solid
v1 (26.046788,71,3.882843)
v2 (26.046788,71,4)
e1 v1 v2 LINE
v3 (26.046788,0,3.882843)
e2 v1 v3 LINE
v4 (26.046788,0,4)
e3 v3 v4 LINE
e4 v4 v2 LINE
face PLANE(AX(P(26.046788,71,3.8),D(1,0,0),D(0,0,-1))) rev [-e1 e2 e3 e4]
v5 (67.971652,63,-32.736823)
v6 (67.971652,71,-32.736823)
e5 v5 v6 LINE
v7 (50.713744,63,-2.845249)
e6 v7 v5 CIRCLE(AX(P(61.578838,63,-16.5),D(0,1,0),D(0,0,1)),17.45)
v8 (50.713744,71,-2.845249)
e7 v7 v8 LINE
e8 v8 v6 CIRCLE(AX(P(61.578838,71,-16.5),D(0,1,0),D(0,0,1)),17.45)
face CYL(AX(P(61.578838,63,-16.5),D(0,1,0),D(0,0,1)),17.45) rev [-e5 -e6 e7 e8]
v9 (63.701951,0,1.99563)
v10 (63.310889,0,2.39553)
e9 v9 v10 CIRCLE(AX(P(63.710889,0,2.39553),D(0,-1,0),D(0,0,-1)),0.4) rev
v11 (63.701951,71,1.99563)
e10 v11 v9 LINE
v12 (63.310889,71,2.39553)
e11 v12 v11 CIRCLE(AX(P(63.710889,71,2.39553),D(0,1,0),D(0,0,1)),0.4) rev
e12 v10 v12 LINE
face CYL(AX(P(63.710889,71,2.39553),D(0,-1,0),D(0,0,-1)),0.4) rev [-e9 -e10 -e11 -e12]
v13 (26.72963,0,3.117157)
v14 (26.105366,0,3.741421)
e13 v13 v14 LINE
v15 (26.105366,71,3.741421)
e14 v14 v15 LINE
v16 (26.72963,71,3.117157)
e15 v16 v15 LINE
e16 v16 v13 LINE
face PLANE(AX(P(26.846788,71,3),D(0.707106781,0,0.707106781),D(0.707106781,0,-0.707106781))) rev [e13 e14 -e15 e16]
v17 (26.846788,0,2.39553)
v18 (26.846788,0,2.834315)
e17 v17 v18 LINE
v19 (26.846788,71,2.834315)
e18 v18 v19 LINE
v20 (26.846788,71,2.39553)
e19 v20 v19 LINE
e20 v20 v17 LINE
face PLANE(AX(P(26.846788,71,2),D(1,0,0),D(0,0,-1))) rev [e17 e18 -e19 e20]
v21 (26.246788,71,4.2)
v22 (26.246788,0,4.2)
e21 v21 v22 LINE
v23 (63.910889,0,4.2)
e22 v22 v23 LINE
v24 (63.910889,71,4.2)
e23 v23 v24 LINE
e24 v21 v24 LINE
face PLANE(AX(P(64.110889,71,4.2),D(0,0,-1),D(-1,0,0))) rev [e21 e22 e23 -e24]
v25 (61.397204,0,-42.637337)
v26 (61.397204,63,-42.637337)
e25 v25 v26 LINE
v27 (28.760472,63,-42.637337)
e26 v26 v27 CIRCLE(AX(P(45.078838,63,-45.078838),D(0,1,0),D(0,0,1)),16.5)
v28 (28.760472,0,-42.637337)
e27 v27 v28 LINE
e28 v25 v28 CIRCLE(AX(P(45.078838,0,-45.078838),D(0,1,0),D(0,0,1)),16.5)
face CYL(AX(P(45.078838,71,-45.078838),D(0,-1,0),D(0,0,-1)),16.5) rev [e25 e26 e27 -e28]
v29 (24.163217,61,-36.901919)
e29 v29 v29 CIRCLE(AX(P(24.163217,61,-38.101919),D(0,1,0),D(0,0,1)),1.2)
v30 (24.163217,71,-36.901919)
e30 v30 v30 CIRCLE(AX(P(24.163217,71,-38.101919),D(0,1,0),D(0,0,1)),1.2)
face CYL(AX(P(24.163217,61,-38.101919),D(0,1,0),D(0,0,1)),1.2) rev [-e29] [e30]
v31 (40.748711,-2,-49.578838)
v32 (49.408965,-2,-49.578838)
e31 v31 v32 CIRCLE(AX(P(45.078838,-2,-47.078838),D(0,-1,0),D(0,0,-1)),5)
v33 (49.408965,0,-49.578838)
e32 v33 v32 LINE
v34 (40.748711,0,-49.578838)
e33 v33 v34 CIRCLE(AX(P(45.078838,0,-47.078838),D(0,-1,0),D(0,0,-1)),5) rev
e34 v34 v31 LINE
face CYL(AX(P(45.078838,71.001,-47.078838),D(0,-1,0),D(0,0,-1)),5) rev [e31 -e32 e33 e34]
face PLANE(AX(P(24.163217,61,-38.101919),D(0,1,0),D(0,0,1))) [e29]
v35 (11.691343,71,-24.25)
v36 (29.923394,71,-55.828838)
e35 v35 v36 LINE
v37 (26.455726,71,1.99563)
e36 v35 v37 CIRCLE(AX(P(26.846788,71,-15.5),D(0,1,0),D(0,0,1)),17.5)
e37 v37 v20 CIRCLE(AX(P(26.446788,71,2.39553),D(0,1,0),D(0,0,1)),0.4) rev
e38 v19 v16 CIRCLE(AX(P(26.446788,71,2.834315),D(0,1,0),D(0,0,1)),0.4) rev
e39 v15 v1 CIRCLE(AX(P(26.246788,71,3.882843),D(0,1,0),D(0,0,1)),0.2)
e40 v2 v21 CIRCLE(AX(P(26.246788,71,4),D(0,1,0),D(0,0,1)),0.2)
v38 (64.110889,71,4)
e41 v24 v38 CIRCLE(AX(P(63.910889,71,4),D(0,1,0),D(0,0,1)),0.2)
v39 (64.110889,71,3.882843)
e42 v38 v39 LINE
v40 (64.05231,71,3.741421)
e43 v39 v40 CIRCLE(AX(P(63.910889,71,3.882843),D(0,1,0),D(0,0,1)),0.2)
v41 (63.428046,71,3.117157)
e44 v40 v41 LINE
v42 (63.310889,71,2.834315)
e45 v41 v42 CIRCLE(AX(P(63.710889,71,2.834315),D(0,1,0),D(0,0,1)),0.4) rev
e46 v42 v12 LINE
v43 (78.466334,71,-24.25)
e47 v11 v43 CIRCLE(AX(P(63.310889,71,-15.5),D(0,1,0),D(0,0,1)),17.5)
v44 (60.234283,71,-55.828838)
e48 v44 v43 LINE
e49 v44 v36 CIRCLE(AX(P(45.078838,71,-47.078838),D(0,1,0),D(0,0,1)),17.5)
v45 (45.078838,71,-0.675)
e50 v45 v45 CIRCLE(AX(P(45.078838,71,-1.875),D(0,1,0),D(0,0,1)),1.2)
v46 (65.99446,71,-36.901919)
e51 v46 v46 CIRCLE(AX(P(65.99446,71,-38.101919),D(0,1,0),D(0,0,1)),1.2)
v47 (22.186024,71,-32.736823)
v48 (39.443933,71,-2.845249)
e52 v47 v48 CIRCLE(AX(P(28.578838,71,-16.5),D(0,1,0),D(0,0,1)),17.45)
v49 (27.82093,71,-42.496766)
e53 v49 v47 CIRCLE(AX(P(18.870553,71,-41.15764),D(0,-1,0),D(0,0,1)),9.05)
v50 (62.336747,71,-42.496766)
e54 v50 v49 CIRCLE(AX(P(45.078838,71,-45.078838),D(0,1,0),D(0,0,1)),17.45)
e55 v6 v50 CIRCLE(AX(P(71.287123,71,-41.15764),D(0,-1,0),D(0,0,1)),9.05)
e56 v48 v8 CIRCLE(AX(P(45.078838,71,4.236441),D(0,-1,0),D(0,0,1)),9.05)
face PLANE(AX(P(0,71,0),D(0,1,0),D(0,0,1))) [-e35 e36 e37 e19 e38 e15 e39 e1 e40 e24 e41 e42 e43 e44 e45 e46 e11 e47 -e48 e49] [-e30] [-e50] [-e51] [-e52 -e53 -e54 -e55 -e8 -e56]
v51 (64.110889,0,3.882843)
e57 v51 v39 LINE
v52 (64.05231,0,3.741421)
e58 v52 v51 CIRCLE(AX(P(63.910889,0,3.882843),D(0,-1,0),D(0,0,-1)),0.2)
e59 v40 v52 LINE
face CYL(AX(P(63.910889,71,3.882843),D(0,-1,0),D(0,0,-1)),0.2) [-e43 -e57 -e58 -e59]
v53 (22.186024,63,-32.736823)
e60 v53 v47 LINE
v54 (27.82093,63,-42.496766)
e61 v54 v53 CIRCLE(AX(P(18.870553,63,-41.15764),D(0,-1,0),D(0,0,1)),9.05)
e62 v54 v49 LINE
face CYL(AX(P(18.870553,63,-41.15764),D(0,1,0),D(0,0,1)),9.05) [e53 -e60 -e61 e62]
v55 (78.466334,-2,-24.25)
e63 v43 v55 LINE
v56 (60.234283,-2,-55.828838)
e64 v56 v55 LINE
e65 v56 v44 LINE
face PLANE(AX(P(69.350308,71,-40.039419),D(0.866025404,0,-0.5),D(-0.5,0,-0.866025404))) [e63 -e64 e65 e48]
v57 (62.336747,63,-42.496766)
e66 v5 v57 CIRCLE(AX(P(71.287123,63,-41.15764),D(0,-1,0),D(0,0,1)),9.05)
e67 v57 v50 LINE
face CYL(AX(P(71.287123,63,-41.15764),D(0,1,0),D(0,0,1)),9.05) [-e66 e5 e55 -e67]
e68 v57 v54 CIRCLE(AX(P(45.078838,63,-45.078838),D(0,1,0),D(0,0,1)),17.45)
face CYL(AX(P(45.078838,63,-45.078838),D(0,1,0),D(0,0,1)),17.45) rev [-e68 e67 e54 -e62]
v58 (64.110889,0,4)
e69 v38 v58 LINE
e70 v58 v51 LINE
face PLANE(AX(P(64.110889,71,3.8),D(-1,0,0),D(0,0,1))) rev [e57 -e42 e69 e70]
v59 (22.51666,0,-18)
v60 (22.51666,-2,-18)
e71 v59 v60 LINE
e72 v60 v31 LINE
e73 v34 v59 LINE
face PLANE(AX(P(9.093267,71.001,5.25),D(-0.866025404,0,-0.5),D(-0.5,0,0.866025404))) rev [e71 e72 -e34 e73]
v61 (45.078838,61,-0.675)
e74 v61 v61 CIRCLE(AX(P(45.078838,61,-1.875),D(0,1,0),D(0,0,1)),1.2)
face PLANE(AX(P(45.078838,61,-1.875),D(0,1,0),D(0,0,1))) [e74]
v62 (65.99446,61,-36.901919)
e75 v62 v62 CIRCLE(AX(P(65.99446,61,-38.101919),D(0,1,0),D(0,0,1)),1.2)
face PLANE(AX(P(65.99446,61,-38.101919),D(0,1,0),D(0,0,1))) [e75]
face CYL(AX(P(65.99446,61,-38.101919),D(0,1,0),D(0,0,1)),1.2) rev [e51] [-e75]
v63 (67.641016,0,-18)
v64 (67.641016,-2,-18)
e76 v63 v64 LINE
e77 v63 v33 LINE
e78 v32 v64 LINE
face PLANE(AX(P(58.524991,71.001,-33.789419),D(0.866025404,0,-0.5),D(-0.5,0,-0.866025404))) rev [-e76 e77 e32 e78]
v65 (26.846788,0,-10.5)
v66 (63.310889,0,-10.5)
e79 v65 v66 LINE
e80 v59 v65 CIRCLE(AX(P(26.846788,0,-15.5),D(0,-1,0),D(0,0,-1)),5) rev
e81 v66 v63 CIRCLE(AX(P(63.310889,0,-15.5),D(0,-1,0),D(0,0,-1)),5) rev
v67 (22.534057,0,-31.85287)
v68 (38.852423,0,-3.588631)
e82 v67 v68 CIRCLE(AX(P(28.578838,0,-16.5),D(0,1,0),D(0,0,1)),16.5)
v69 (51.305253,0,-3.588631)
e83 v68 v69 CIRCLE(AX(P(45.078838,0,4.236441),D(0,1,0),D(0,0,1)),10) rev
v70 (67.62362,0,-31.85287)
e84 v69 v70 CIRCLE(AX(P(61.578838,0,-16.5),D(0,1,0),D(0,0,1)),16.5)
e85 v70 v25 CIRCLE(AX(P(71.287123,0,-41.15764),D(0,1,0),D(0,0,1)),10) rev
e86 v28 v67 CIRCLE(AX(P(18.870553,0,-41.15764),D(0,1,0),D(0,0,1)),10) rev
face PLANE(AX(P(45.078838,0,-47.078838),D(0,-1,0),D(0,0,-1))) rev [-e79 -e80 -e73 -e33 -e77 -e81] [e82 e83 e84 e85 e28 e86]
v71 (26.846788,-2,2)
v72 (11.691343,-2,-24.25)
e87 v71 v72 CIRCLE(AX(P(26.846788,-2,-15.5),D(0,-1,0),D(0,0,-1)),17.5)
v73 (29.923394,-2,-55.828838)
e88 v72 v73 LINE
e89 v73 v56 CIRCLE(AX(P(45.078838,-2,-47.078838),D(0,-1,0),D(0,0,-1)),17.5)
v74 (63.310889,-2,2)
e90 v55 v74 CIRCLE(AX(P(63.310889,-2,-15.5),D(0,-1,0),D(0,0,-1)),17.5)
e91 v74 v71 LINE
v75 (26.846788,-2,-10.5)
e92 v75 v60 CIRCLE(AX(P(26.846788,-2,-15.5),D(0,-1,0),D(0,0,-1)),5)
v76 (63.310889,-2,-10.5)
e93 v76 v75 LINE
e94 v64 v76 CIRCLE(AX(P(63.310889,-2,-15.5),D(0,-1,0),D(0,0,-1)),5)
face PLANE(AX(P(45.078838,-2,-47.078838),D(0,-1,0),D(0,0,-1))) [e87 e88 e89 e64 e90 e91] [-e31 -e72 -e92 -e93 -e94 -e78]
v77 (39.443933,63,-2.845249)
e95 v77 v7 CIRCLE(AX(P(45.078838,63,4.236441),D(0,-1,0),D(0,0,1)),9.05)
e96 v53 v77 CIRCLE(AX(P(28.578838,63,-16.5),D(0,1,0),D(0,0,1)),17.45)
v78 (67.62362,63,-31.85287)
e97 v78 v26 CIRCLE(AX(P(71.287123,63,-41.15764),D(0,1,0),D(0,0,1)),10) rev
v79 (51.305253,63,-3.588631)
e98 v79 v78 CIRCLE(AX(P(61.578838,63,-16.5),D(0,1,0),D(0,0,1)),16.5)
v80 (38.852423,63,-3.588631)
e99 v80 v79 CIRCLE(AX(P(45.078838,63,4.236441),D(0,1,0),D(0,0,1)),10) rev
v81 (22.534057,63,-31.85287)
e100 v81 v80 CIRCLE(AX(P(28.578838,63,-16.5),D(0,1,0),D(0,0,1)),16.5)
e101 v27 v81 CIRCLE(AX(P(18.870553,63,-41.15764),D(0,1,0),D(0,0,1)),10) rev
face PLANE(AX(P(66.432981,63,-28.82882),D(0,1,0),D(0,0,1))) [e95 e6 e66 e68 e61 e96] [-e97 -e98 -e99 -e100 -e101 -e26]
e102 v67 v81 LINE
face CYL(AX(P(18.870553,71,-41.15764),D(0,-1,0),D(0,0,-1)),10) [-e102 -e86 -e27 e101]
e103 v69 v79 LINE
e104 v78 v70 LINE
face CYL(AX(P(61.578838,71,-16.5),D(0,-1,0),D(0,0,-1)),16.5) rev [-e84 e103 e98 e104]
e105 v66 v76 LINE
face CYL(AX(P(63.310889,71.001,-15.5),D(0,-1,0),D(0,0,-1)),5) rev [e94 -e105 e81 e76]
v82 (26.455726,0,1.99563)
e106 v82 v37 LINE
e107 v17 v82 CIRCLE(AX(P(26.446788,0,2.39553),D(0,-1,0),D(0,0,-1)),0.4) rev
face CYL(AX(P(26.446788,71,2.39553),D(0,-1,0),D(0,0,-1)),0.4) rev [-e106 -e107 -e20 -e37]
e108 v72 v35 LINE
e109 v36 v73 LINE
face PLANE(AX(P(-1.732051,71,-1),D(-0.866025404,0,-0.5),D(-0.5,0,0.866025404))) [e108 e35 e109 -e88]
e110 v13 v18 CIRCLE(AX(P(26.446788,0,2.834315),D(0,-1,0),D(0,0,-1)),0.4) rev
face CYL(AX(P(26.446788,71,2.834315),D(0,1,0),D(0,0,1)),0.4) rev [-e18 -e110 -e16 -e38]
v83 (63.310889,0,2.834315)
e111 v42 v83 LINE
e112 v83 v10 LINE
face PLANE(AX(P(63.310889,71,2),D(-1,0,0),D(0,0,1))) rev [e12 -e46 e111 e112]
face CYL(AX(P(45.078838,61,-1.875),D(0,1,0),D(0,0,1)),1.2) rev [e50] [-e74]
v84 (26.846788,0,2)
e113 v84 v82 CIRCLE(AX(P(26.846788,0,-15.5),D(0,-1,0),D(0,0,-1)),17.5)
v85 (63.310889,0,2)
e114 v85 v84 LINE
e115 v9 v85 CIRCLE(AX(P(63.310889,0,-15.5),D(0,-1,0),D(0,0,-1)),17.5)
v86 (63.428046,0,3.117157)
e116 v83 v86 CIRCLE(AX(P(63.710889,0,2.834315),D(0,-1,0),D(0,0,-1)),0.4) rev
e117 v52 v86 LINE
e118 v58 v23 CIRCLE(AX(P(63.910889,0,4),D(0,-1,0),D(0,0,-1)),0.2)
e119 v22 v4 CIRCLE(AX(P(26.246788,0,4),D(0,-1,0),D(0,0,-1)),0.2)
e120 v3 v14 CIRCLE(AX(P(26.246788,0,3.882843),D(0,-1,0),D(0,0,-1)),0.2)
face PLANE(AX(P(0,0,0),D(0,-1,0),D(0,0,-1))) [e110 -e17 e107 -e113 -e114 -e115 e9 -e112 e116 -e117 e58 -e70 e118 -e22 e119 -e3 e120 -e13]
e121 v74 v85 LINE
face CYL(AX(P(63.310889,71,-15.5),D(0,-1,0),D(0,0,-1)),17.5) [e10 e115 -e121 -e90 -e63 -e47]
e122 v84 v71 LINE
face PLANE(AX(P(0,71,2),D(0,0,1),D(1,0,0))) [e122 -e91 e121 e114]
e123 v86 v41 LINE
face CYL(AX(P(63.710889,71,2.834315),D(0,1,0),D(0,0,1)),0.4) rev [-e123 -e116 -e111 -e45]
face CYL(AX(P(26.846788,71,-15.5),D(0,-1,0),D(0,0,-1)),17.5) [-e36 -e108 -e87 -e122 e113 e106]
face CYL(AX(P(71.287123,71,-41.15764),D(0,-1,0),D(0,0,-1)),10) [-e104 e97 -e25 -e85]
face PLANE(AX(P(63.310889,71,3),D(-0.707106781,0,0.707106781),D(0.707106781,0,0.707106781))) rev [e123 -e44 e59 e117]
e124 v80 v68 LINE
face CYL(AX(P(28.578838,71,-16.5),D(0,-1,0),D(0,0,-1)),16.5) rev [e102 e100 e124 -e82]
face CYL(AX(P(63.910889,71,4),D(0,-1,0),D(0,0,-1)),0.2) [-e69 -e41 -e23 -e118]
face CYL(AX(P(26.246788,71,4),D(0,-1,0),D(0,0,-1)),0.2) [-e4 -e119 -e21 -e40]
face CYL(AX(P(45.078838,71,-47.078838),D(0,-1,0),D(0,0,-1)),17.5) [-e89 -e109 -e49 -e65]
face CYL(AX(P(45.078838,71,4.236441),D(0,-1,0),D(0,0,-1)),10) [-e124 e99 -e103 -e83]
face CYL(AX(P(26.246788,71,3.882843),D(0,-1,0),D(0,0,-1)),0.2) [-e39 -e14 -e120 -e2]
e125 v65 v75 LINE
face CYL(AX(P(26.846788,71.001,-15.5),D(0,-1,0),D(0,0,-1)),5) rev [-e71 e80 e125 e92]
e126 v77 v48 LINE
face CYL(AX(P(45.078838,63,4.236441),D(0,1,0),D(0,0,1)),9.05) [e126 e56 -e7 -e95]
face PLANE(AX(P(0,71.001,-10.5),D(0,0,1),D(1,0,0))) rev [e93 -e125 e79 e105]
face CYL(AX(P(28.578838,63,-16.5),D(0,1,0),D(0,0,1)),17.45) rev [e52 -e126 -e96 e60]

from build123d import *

# Parameters (mm, degrees)
BOSS_EXTRUDE1_DEPTH   = 71
BOSS_EXTRUDE1_2_DEPTH = 71
CUT_EXTRUDE1_START    = -71
CUT_EXTRUDE1_DEPTH    = 71
FILLET1_DEPTH         = 71
FILLET2_R             = 17.5
BOSS_EXTRUDE2_DEPTH   = 2
CUT_EXTRUDE2_REACH    = 128.609
SKETCH5_R             = 1.2
CUT_EXTRUDE3_DEPTH    = 10
CUT_EXTRUDE4_DEPTH    = 8
BOSS_EXTRUDE3_DEPTH   = 71
FILLET3_R             = 0.4
FILLET4_R             = 0.2


with BuildPart() as part:
    # Sketch1 → Boss-Extrude1 (new body)
    with BuildSketch(Plane(origin=(0, 0, 0), x_dir=(1, 0, 0), z_dir=(0, 1, 0))):
        Polygon((-3.464101615, -2), (93.621778265, -2), (45.078838325, 82.078838325), align=None)
        with BuildLine():
            ThreePointArc((53.328838206, 30.789419094), (75.868257522, 8.250000059), (45.078838325, 16.5))
            ThreePointArc((45.078838325, 16.5), (14.289419055, 8.250000187), (36.828838698, 30.789418947))
            ThreePointArc((36.828838698, 30.789418947), (45.078838178, 61.578838325), (53.328838206, 30.789419094))
        make_face(mode=Mode.SUBTRACT)
    extrude(amount=BOSS_EXTRUDE1_DEPTH)

    # Fillet1: read off the stored shape, not the designer's step
    # Fillet1 outline → Fillet1 (cut)
    with BuildSketch(Plane(origin=(0, 0, 0), x_dir=(1, 0, 0), z_dir=(0, 1, 0))):
        with BuildLine():
            ThreePointArc((53.328838325, 30.789419162), (60.354714381, 32.954528877), (67.623619549, 31.852870088))
            ThreePointArc((67.623619549, 31.852870088), (62.626869283, 36.157639839), (61.397204455, 42.637337381))
            ThreePointArc((61.397204455, 42.637337381), (58.716816368, 35.791451453), (53.328838325, 30.789419162))
        make_face()
        with BuildLine():
            ThreePointArc((38.852423231, 3.588630855), (45.078838325, 5.763558647), (51.305253419, 3.588630855))
            ThreePointArc((51.305253419, 3.588630855), (46.716736338, 9.332857994), (45.078838325, 16.5))
            ThreePointArc((45.078838325, 16.5), (43.440940312, 9.332857994), (38.852423231, 3.588630855))
        make_face()
        with BuildLine():
            ThreePointArc((36.828838325, 30.789419162), (31.440860282, 35.791451453), (28.760472195, 42.637337381))
            ThreePointArc((28.760472195, 42.637337381), (27.530807367, 36.157639839), (22.534057101, 31.852870089))
            ThreePointArc((22.534057101, 31.852870089), (29.802962269, 32.954528877), (36.828838325, 30.789419162))
        make_face()
    extrude(amount=FILLET1_DEPTH, mode=Mode.SUBTRACT)

    # Fillet2
    fillet2_edges = [part.edges().sort_by_distance(p)[0] for p in [
        (93.621778265, 35.5, 2),
        (-3.464101615, 35.5, 2),
        (45.078838325, 35.5, -82.078838325),
    ]]
    fillet(fillet2_edges, radius=FILLET2_R)

    # Sketch3 → Boss-Extrude2 (add)
    with BuildSketch(Plane.XZ):
        with BuildLine():
            Line((60.234282891, -55.828838325), (78.466333699, -24.25))
            ThreePointArc((78.466333699, -24.25), (78.466333699, -6.75), (63.310889132, 2))
            Line((63.310889132, 2), (26.846787517, 2))
            ThreePointArc((26.846787517, 2), (11.691342951, -6.75), (11.691342951, -24.25))
            Line((11.691342951, -24.25), (29.923393759, -55.828838325))
            ThreePointArc((29.923393759, -55.828838325), (45.078838325, -64.578838325), (60.234282891, -55.828838325))
        make_face()
    extrude(amount=BOSS_EXTRUDE2_DEPTH)

    # Sketch4 → Cut-Extrude2 (cut, up to next)
    with BuildSketch(Plane.XZ.offset(2), mode=Mode.PRIVATE) as cut_extrude2_sk1:
        with BuildLine():
            Line((63.310889132, -10.5), (26.846787517, -10.5))
            ThreePointArc((26.846787517, -10.5), (22.516660498, -13), (22.516660498, -18))
            Line((22.516660498, -18), (40.748711306, -49.578838325))
            ThreePointArc((40.748711306, -49.578838325), (45.078838325, -52.078838325), (49.408965344, -49.578838325))
            Line((49.408965344, -49.578838325), (67.641016151, -18))
            ThreePointArc((67.641016151, -18), (67.641016151, -13), (63.310889132, -10.5))
        make_face()
    cut_extrude2_tool1 = extrude(cut_extrude2_sk1.sketch, amount=-CUT_EXTRUDE2_REACH, mode=Mode.PRIVATE) & part.part
    add(cut_extrude2_tool1.solids().sort_by_distance((45.078838, -2, -26.026279))[0], mode=Mode.SUBTRACT)

    # Sketch5 → Cut-Extrude3 (cut)
    with BuildSketch(Plane(origin=(0, 71, 0), x_dir=(1, 0, 0), z_dir=(0, 1, 0))):
        with Locations(Location((45.078838325, 1.875, 0), (0, 0, 270))):
            Circle(SKETCH5_R)
        with Locations(Location((24.163216795, 38.101919162, 0), (0, 0, 270))):
            Circle(SKETCH5_R)
        with Locations(Location((65.994459855, 38.101919162, 0), (0, 0, 270))):
            Circle(SKETCH5_R)
    extrude(amount=-CUT_EXTRUDE3_DEPTH, mode=Mode.SUBTRACT)

    # Sketch7 → Cut-Extrude4 (cut)
    with BuildSketch(Plane(origin=(0, 71, 0), x_dir=(1, 0, 0), z_dir=(0, 1, 0))):
        with BuildLine():
            ThreePointArc((50.713743985, 2.845248996), (45.078838325, 4.813558647), (39.443932665, 2.845248996))
            ThreePointArc((39.443932665, 2.845248996), (13.466695029, 7.775), (22.186024243, 32.736823215))
            ThreePointArc((22.186024243, 32.736823215), (26.708083233, 36.632639839), (27.820929903, 42.496766114))
            ThreePointArc((27.820929903, 42.496766114), (45.078838325, 62.528838325), (62.336746747, 42.496766114))
            ThreePointArc((62.336746747, 42.496766114), (63.449593417, 36.632639839), (67.971652407, 32.736823215))
            ThreePointArc((67.971652407, 32.736823215), (76.690981621, 7.775), (50.713743985, 2.845248996))
        make_face()
    extrude(amount=-CUT_EXTRUDE4_DEPTH, mode=Mode.SUBTRACT)

    # Sketch8 → Boss-Extrude3 (add, through all)
    with BuildSketch(Plane(origin=(0, 0, 0), x_dir=(1, 0, 0), z_dir=(0, 1, 0))):
        Polygon((63.310889132, -2), (63.310889132, -3), (64.110889132, -3.8), (64.110889132, -4.2), (26.046787517, -4.2), (26.046787517, -3.8), (26.846787517, -3), (26.846787517, -2), align=None)
    extrude(amount=BOSS_EXTRUDE3_DEPTH)

    # Fillet3
    fillet3_edges = [part.edges().sort_by_distance(p)[0] for p in [
        (63.310889132, 35.5, 2),
        (26.846787517, 35.5, 3),
        (63.310889132, 35.5, 3),
        (26.846787517, 35.5, 2),
    ]]
    fillet(fillet3_edges, radius=FILLET3_R)

    # Fillet4
    fillet4_edges = [part.edges().sort_by_distance(p)[0] for p in [
        (26.046787517, 35.5, 3.8),
        (26.046787517, 35.5, 4.2),
        (64.110889132, 35.5, 4.2),
        (64.110889132, 35.5, 3.8),
    ]]
    fillet(fillet4_edges, radius=FILLET4_R)


with BuildPart() as body_2:
    # Sketch1 → Boss-Extrude1 2 (new body)
    with BuildSketch(Plane(origin=(0, 0, 0), x_dir=(1, 0, 0), z_dir=(0, 1, 0))):
        with BuildLine():
            ThreePointArc((36.828838698, 30.789418947), (42.868257595, 24.749999813), (45.078838325, 16.5))
            ThreePointArc((45.078838325, 16.5), (47.289419128, 24.749999941), (53.328838206, 30.789419094))
            ThreePointArc((53.328838206, 30.789419094), (45.078838472, 28.578838325), (36.828838698, 30.789418947))
        make_face()
    extrude(amount=BOSS_EXTRUDE1_2_DEPTH)

    # Sketch2 → Cut-Extrude1 (cut)
    with BuildSketch(Plane(origin=(0, 71, 0), x_dir=(1, 0, 0), z_dir=(0, 1, 0)).offset(CUT_EXTRUDE1_START)):
        with BuildLine():
            ThreePointArc((36.828838325, 30.789419162), (45.078838325, 28.578838325), (53.328838325, 30.789419162))
            ThreePointArc((53.328838325, 30.789419162), (47.289419162, 24.75), (45.078838325, 16.5))
            ThreePointArc((45.078838325, 16.5), (42.868257487, 24.75), (36.828838325, 30.789419162))
        make_face()
    extrude(amount=CUT_EXTRUDE1_DEPTH, mode=Mode.SUBTRACT)


solid = part.part
